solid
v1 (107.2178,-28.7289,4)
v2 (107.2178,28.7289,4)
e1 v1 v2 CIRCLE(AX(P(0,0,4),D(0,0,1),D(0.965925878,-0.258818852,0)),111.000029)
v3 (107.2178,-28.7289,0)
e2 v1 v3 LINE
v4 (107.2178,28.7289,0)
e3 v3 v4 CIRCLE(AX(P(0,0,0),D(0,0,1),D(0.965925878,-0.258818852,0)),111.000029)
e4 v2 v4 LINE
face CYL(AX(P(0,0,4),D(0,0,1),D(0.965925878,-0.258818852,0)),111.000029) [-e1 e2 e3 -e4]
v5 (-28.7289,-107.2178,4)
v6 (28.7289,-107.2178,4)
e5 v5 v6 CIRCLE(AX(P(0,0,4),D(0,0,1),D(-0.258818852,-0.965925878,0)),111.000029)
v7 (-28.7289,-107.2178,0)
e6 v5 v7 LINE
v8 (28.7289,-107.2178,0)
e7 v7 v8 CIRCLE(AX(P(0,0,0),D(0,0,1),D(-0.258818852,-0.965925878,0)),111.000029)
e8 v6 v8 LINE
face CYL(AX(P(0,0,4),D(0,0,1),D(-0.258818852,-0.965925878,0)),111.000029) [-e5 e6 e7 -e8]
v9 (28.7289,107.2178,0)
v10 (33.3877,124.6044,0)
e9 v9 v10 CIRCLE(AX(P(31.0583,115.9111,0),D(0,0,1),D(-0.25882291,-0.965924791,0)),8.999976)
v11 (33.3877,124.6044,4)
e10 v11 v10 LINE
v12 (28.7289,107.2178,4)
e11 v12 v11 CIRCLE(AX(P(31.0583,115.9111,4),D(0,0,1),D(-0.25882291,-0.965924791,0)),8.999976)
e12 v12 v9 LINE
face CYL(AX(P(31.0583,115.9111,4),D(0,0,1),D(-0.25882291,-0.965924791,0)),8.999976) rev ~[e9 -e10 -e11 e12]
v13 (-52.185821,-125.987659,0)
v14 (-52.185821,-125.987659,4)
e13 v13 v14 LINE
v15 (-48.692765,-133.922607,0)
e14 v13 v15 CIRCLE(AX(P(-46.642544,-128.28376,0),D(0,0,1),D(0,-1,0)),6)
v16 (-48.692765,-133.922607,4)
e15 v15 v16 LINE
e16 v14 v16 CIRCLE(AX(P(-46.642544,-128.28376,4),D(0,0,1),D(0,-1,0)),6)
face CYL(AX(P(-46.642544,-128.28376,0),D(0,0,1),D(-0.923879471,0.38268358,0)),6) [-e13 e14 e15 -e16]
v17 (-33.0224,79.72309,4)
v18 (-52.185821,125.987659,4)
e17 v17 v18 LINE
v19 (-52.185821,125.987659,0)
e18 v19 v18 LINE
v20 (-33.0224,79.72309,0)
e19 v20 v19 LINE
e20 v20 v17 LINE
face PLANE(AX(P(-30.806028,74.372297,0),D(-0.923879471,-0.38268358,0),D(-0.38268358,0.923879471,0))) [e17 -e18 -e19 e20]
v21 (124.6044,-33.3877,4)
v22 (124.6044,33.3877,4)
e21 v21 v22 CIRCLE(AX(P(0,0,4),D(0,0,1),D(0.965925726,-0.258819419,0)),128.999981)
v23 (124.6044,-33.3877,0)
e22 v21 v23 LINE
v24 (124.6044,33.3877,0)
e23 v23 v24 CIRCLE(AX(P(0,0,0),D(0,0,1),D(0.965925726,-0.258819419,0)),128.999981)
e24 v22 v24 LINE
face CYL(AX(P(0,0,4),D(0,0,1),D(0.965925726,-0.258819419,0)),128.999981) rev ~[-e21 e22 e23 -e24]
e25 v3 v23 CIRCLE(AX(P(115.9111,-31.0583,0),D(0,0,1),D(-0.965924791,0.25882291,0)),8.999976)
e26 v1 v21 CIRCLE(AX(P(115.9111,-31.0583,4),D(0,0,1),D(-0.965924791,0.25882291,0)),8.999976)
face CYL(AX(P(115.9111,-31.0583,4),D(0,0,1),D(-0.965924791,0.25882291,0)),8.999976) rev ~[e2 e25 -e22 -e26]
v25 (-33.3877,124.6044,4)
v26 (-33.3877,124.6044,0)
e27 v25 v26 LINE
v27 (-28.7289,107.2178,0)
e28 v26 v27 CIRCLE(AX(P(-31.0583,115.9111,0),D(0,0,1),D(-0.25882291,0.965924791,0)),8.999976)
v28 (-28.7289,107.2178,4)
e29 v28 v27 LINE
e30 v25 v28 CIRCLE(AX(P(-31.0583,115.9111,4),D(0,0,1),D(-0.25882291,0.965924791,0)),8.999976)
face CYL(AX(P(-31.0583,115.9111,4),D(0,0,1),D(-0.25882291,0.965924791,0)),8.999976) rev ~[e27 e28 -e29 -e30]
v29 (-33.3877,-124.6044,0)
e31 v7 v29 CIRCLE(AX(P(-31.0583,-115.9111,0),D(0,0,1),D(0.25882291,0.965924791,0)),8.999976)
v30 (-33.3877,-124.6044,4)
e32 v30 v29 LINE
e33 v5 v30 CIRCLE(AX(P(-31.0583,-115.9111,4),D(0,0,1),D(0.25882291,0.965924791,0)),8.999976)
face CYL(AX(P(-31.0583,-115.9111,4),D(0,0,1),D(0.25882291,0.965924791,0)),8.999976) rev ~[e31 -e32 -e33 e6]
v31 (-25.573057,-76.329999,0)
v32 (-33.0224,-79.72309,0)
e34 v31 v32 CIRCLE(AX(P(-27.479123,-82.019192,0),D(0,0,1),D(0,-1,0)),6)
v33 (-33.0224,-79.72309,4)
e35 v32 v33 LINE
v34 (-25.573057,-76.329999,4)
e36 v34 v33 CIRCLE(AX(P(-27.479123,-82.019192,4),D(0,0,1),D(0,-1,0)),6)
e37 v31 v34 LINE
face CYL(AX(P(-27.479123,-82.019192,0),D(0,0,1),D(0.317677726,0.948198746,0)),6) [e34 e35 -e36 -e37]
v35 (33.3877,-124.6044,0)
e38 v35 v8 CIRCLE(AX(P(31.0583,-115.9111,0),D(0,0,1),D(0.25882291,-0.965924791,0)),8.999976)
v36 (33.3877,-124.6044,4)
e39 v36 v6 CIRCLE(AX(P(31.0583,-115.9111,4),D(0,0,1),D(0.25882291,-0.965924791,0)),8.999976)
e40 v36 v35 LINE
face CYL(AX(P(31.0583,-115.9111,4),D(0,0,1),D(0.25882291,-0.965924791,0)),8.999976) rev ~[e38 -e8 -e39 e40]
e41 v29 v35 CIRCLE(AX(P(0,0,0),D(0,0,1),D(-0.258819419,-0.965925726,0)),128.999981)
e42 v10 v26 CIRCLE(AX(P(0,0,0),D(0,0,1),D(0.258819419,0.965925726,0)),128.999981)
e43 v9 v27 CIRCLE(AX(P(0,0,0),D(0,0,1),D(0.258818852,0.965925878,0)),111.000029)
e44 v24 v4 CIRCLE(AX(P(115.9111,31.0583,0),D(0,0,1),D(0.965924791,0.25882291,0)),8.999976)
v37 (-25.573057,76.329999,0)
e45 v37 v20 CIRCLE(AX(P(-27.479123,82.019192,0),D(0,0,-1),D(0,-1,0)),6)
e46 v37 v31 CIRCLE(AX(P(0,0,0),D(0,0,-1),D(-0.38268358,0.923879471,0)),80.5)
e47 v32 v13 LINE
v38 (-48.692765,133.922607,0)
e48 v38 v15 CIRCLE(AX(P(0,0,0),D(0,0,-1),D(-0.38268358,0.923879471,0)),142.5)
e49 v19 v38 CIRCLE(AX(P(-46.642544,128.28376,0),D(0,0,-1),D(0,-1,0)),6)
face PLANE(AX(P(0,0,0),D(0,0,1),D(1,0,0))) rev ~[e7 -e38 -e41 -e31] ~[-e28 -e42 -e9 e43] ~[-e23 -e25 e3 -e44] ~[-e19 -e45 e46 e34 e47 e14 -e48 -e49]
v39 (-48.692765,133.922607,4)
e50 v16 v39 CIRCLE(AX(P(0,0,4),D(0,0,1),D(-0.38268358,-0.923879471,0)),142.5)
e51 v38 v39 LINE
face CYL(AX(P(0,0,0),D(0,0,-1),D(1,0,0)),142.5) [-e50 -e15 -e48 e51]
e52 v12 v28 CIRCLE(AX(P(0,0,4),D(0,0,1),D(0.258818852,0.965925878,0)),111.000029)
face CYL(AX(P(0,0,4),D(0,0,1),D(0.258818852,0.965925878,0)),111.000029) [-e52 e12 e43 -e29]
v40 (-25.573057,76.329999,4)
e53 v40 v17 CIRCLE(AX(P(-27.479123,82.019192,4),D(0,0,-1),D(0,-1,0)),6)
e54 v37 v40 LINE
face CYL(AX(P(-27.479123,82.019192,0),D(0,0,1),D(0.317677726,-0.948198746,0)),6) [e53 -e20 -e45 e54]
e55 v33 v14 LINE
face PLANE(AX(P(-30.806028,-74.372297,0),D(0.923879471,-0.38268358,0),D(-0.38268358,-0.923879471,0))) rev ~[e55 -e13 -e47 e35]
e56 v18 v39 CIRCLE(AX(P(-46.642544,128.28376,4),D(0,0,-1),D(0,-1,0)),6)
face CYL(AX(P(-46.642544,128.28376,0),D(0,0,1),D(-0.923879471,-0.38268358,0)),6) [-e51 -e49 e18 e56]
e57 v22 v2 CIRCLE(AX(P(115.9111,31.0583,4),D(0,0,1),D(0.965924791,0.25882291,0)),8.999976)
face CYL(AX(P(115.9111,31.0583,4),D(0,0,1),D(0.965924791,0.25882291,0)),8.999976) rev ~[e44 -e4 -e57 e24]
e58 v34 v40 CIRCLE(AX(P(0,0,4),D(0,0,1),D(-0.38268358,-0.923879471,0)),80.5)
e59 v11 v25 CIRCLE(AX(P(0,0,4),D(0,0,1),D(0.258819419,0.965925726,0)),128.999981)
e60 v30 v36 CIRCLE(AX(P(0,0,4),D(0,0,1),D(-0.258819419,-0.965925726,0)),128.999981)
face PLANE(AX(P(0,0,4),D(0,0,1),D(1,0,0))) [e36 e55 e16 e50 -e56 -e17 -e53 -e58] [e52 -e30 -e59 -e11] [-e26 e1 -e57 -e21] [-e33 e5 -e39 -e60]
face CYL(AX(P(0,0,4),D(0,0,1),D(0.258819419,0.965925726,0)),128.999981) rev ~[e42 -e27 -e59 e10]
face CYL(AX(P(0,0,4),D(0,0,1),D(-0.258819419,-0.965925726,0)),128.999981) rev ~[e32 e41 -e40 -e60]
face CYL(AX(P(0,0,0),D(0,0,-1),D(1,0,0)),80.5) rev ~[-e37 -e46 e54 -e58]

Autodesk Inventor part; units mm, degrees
ref_plane "YZ Plane" through (0, 0, 0) normal (1, 0, 0) x (0, 1, 0)
ref_plane "XZ Plane" through (0, 0, 0) normal (0, 1, 0) x (-1, 0, 0)
ref_plane "XY Plane" through (0, 0, 0) normal (0, 0, 1) x (1, 0, 0)
sketch "Sketch2" plane through (0, 0, 0) normal (0, 0, 1) x (1, 0, 0)
  circle A0 centre (0, 0) radius 80.5
  circle A1 centre (0, 0) radius 142.5
  line L0 (0, 0) -> (-54.5324, 131.6528)
  line L1 (0, 0) -> (-54.5324, -131.6528)
  line L2 (0, 0) -> (-142.5, 0) construction
  point P0 (-30.806, -74.3723)
  point P1 (-30.806, 74.3723)
  dimension "d25" = 161
  dimension "d27" = 285
  dimension "d29" = 135
extrude "Plate2" add sketch "Sketch2" along normal blind 4 contours A0 L0 A1 L1 picked at (65.8732, 102.2302)
sketch "Sketch3" plane through (0, 0, 4) normal (0, 0, 1) x (1, 0, 0)
  circle A0 centre (0, 0) radius 120 construction
  arc A1 (31.0583, 115.9111) -> (-31.0583, 115.9111) centre (0, 0) ccw construction
  arc A2 (33.3877, 124.6044) -> (-33.3877, 124.6044) centre (0, 0) ccw
  arc A3 (28.7289, 107.2178) -> (-28.7289, 107.2178) centre (0, 0) ccw
  arc A4 (28.7289, 107.2178) -> (33.3877, 124.6044) centre (31.0583, 115.9111) ccw
  arc A5 (-33.3877, 124.6044) -> (-28.7289, 107.2178) centre (-31.0583, 115.9111) ccw
  line L0 (-31.0583, 115.9111) -> (0, 0)
  line L1 (0, 0) -> (31.0583, 115.9111)
  line L2 (0, 0) -> (0, 70.9879)
  dimension "d28" = 240
  dimension "d30" = 18
  dimension "d31" = 30
extrude "Cut1" cut sketch "Sketch3" against normal blind 4 contours A4 A3 A5 A2
pattern_circular "Circular Pattern1" count 4 over 360 about axis through (0, 0, 0) along (0, 0, 1) of "Cut1"
fillet "Corner Round1" radius 6 4 edges at (-54.5324, 131.6528, 2) (-30.806, 74.3723, 2) (-30.806, -74.3723, 2) (-54.5324, -131.6528, 2)
sketch "Sketch5" plane through (0, 0, 0) normal (0, 0, -1) x (-1, 0, 0)
  arc A0 (-107.2178, 28.7289) -> (-107.2178, -28.7289) centre (0, 0) ccw projected
  arc A1 (-124.6044, -33.3877) -> (-107.2178, -28.7289) centre (-115.9111, -31.0583) ccw projected
  arc A2 (-124.6044, 33.3877) -> (-124.6044, -33.3877) centre (0, 0) ccw projected
  arc A3 (-107.2178, 28.7289) -> (-124.6044, 33.3877) centre (-115.9111, 31.0583) ccw projected
  arc A4 (-28.7289, -107.2178) -> (28.7289, -107.2178) centre (0, 0) ccw projected
  arc A5 (33.3877, -124.6044) -> (28.7289, -107.2178) centre (31.0583, -115.9111) ccw projected
  arc A6 (-33.3877, -124.6044) -> (33.3877, -124.6044) centre (0, 0) ccw projected
  arc A7 (-28.7289, -107.2178) -> (-33.3877, -124.6044) centre (-31.0583, -115.9111) ccw projected
  arc A8 (28.7289, 107.2178) -> (-28.7289, 107.2178) centre (0, 0) ccw projected
  arc A9 (-33.3877, 124.6044) -> (-28.7289, 107.2178) centre (-31.0583, 115.9111) ccw projected
  arc A10 (33.3877, 124.6044) -> (-33.3877, 124.6044) centre (0, 0) ccw projected
  arc A11 (28.7289, 107.2178) -> (33.3877, 124.6044) centre (31.0583, 115.9111) ccw projected
  arc A12 (48.6927, -133.9226) -> (52.1858, -125.9877) centre (46.6425, -128.2838) ccw projected
  line L0 (33.0224, -79.7231) -> (52.1858, -125.9877) projected
  arc A13 (33.0224, -79.7231) -> (25.573, -76.33) centre (27.4791, -82.0192) ccw projected
  arc A14 (25.573, 76.33) -> (25.573, -76.33) centre (0, 0) ccw projected
  arc A15 (25.573, 76.33) -> (33.0224, 79.7231) centre (27.4791, 82.0192) ccw projected
  line L1 (52.1858, 125.9877) -> (33.0224, 79.7231) projected
  arc A16 (52.1858, 125.9877) -> (48.6927, 133.9226) centre (46.6425, 128.2838) ccw projected
  arc A17 (48.6927, 133.9226) -> (48.6927, -133.9226) centre (0, 0) ccw projected
  line L2 (14.6903, 87.3165) -> (-84.3637, 63.9504)
  line L3 (-84.3637, 63.9504) -> (-84.3637, -55.2862)
  line L4 (-84.3637, -55.2862) -> (17.3285, -91.5935)
equation "\"d17\" = Thickness"
equation "\"d14\" = Thickness"
equation "\"BendReliefWidth\" = Thickness"
equation "\"BendReliefDepth\" = 0.5 * Thickness"
equation "\"CornerReliefSize\" = 4 * Thickness"
equation "\"MinimumRemnant\" = 2 * Thickness"
equation "\"TransitionRadius\" = BendRadius"
equation "\"JacobiRadiusSize\" = BendRadius"
equation "\"GapSize\" = Thickness"
equation "\"Thickness\" = 4"
equation "\"BendRadius\" = 6"
properties part number "PNS 1707 funnel flange" material "Steel"
